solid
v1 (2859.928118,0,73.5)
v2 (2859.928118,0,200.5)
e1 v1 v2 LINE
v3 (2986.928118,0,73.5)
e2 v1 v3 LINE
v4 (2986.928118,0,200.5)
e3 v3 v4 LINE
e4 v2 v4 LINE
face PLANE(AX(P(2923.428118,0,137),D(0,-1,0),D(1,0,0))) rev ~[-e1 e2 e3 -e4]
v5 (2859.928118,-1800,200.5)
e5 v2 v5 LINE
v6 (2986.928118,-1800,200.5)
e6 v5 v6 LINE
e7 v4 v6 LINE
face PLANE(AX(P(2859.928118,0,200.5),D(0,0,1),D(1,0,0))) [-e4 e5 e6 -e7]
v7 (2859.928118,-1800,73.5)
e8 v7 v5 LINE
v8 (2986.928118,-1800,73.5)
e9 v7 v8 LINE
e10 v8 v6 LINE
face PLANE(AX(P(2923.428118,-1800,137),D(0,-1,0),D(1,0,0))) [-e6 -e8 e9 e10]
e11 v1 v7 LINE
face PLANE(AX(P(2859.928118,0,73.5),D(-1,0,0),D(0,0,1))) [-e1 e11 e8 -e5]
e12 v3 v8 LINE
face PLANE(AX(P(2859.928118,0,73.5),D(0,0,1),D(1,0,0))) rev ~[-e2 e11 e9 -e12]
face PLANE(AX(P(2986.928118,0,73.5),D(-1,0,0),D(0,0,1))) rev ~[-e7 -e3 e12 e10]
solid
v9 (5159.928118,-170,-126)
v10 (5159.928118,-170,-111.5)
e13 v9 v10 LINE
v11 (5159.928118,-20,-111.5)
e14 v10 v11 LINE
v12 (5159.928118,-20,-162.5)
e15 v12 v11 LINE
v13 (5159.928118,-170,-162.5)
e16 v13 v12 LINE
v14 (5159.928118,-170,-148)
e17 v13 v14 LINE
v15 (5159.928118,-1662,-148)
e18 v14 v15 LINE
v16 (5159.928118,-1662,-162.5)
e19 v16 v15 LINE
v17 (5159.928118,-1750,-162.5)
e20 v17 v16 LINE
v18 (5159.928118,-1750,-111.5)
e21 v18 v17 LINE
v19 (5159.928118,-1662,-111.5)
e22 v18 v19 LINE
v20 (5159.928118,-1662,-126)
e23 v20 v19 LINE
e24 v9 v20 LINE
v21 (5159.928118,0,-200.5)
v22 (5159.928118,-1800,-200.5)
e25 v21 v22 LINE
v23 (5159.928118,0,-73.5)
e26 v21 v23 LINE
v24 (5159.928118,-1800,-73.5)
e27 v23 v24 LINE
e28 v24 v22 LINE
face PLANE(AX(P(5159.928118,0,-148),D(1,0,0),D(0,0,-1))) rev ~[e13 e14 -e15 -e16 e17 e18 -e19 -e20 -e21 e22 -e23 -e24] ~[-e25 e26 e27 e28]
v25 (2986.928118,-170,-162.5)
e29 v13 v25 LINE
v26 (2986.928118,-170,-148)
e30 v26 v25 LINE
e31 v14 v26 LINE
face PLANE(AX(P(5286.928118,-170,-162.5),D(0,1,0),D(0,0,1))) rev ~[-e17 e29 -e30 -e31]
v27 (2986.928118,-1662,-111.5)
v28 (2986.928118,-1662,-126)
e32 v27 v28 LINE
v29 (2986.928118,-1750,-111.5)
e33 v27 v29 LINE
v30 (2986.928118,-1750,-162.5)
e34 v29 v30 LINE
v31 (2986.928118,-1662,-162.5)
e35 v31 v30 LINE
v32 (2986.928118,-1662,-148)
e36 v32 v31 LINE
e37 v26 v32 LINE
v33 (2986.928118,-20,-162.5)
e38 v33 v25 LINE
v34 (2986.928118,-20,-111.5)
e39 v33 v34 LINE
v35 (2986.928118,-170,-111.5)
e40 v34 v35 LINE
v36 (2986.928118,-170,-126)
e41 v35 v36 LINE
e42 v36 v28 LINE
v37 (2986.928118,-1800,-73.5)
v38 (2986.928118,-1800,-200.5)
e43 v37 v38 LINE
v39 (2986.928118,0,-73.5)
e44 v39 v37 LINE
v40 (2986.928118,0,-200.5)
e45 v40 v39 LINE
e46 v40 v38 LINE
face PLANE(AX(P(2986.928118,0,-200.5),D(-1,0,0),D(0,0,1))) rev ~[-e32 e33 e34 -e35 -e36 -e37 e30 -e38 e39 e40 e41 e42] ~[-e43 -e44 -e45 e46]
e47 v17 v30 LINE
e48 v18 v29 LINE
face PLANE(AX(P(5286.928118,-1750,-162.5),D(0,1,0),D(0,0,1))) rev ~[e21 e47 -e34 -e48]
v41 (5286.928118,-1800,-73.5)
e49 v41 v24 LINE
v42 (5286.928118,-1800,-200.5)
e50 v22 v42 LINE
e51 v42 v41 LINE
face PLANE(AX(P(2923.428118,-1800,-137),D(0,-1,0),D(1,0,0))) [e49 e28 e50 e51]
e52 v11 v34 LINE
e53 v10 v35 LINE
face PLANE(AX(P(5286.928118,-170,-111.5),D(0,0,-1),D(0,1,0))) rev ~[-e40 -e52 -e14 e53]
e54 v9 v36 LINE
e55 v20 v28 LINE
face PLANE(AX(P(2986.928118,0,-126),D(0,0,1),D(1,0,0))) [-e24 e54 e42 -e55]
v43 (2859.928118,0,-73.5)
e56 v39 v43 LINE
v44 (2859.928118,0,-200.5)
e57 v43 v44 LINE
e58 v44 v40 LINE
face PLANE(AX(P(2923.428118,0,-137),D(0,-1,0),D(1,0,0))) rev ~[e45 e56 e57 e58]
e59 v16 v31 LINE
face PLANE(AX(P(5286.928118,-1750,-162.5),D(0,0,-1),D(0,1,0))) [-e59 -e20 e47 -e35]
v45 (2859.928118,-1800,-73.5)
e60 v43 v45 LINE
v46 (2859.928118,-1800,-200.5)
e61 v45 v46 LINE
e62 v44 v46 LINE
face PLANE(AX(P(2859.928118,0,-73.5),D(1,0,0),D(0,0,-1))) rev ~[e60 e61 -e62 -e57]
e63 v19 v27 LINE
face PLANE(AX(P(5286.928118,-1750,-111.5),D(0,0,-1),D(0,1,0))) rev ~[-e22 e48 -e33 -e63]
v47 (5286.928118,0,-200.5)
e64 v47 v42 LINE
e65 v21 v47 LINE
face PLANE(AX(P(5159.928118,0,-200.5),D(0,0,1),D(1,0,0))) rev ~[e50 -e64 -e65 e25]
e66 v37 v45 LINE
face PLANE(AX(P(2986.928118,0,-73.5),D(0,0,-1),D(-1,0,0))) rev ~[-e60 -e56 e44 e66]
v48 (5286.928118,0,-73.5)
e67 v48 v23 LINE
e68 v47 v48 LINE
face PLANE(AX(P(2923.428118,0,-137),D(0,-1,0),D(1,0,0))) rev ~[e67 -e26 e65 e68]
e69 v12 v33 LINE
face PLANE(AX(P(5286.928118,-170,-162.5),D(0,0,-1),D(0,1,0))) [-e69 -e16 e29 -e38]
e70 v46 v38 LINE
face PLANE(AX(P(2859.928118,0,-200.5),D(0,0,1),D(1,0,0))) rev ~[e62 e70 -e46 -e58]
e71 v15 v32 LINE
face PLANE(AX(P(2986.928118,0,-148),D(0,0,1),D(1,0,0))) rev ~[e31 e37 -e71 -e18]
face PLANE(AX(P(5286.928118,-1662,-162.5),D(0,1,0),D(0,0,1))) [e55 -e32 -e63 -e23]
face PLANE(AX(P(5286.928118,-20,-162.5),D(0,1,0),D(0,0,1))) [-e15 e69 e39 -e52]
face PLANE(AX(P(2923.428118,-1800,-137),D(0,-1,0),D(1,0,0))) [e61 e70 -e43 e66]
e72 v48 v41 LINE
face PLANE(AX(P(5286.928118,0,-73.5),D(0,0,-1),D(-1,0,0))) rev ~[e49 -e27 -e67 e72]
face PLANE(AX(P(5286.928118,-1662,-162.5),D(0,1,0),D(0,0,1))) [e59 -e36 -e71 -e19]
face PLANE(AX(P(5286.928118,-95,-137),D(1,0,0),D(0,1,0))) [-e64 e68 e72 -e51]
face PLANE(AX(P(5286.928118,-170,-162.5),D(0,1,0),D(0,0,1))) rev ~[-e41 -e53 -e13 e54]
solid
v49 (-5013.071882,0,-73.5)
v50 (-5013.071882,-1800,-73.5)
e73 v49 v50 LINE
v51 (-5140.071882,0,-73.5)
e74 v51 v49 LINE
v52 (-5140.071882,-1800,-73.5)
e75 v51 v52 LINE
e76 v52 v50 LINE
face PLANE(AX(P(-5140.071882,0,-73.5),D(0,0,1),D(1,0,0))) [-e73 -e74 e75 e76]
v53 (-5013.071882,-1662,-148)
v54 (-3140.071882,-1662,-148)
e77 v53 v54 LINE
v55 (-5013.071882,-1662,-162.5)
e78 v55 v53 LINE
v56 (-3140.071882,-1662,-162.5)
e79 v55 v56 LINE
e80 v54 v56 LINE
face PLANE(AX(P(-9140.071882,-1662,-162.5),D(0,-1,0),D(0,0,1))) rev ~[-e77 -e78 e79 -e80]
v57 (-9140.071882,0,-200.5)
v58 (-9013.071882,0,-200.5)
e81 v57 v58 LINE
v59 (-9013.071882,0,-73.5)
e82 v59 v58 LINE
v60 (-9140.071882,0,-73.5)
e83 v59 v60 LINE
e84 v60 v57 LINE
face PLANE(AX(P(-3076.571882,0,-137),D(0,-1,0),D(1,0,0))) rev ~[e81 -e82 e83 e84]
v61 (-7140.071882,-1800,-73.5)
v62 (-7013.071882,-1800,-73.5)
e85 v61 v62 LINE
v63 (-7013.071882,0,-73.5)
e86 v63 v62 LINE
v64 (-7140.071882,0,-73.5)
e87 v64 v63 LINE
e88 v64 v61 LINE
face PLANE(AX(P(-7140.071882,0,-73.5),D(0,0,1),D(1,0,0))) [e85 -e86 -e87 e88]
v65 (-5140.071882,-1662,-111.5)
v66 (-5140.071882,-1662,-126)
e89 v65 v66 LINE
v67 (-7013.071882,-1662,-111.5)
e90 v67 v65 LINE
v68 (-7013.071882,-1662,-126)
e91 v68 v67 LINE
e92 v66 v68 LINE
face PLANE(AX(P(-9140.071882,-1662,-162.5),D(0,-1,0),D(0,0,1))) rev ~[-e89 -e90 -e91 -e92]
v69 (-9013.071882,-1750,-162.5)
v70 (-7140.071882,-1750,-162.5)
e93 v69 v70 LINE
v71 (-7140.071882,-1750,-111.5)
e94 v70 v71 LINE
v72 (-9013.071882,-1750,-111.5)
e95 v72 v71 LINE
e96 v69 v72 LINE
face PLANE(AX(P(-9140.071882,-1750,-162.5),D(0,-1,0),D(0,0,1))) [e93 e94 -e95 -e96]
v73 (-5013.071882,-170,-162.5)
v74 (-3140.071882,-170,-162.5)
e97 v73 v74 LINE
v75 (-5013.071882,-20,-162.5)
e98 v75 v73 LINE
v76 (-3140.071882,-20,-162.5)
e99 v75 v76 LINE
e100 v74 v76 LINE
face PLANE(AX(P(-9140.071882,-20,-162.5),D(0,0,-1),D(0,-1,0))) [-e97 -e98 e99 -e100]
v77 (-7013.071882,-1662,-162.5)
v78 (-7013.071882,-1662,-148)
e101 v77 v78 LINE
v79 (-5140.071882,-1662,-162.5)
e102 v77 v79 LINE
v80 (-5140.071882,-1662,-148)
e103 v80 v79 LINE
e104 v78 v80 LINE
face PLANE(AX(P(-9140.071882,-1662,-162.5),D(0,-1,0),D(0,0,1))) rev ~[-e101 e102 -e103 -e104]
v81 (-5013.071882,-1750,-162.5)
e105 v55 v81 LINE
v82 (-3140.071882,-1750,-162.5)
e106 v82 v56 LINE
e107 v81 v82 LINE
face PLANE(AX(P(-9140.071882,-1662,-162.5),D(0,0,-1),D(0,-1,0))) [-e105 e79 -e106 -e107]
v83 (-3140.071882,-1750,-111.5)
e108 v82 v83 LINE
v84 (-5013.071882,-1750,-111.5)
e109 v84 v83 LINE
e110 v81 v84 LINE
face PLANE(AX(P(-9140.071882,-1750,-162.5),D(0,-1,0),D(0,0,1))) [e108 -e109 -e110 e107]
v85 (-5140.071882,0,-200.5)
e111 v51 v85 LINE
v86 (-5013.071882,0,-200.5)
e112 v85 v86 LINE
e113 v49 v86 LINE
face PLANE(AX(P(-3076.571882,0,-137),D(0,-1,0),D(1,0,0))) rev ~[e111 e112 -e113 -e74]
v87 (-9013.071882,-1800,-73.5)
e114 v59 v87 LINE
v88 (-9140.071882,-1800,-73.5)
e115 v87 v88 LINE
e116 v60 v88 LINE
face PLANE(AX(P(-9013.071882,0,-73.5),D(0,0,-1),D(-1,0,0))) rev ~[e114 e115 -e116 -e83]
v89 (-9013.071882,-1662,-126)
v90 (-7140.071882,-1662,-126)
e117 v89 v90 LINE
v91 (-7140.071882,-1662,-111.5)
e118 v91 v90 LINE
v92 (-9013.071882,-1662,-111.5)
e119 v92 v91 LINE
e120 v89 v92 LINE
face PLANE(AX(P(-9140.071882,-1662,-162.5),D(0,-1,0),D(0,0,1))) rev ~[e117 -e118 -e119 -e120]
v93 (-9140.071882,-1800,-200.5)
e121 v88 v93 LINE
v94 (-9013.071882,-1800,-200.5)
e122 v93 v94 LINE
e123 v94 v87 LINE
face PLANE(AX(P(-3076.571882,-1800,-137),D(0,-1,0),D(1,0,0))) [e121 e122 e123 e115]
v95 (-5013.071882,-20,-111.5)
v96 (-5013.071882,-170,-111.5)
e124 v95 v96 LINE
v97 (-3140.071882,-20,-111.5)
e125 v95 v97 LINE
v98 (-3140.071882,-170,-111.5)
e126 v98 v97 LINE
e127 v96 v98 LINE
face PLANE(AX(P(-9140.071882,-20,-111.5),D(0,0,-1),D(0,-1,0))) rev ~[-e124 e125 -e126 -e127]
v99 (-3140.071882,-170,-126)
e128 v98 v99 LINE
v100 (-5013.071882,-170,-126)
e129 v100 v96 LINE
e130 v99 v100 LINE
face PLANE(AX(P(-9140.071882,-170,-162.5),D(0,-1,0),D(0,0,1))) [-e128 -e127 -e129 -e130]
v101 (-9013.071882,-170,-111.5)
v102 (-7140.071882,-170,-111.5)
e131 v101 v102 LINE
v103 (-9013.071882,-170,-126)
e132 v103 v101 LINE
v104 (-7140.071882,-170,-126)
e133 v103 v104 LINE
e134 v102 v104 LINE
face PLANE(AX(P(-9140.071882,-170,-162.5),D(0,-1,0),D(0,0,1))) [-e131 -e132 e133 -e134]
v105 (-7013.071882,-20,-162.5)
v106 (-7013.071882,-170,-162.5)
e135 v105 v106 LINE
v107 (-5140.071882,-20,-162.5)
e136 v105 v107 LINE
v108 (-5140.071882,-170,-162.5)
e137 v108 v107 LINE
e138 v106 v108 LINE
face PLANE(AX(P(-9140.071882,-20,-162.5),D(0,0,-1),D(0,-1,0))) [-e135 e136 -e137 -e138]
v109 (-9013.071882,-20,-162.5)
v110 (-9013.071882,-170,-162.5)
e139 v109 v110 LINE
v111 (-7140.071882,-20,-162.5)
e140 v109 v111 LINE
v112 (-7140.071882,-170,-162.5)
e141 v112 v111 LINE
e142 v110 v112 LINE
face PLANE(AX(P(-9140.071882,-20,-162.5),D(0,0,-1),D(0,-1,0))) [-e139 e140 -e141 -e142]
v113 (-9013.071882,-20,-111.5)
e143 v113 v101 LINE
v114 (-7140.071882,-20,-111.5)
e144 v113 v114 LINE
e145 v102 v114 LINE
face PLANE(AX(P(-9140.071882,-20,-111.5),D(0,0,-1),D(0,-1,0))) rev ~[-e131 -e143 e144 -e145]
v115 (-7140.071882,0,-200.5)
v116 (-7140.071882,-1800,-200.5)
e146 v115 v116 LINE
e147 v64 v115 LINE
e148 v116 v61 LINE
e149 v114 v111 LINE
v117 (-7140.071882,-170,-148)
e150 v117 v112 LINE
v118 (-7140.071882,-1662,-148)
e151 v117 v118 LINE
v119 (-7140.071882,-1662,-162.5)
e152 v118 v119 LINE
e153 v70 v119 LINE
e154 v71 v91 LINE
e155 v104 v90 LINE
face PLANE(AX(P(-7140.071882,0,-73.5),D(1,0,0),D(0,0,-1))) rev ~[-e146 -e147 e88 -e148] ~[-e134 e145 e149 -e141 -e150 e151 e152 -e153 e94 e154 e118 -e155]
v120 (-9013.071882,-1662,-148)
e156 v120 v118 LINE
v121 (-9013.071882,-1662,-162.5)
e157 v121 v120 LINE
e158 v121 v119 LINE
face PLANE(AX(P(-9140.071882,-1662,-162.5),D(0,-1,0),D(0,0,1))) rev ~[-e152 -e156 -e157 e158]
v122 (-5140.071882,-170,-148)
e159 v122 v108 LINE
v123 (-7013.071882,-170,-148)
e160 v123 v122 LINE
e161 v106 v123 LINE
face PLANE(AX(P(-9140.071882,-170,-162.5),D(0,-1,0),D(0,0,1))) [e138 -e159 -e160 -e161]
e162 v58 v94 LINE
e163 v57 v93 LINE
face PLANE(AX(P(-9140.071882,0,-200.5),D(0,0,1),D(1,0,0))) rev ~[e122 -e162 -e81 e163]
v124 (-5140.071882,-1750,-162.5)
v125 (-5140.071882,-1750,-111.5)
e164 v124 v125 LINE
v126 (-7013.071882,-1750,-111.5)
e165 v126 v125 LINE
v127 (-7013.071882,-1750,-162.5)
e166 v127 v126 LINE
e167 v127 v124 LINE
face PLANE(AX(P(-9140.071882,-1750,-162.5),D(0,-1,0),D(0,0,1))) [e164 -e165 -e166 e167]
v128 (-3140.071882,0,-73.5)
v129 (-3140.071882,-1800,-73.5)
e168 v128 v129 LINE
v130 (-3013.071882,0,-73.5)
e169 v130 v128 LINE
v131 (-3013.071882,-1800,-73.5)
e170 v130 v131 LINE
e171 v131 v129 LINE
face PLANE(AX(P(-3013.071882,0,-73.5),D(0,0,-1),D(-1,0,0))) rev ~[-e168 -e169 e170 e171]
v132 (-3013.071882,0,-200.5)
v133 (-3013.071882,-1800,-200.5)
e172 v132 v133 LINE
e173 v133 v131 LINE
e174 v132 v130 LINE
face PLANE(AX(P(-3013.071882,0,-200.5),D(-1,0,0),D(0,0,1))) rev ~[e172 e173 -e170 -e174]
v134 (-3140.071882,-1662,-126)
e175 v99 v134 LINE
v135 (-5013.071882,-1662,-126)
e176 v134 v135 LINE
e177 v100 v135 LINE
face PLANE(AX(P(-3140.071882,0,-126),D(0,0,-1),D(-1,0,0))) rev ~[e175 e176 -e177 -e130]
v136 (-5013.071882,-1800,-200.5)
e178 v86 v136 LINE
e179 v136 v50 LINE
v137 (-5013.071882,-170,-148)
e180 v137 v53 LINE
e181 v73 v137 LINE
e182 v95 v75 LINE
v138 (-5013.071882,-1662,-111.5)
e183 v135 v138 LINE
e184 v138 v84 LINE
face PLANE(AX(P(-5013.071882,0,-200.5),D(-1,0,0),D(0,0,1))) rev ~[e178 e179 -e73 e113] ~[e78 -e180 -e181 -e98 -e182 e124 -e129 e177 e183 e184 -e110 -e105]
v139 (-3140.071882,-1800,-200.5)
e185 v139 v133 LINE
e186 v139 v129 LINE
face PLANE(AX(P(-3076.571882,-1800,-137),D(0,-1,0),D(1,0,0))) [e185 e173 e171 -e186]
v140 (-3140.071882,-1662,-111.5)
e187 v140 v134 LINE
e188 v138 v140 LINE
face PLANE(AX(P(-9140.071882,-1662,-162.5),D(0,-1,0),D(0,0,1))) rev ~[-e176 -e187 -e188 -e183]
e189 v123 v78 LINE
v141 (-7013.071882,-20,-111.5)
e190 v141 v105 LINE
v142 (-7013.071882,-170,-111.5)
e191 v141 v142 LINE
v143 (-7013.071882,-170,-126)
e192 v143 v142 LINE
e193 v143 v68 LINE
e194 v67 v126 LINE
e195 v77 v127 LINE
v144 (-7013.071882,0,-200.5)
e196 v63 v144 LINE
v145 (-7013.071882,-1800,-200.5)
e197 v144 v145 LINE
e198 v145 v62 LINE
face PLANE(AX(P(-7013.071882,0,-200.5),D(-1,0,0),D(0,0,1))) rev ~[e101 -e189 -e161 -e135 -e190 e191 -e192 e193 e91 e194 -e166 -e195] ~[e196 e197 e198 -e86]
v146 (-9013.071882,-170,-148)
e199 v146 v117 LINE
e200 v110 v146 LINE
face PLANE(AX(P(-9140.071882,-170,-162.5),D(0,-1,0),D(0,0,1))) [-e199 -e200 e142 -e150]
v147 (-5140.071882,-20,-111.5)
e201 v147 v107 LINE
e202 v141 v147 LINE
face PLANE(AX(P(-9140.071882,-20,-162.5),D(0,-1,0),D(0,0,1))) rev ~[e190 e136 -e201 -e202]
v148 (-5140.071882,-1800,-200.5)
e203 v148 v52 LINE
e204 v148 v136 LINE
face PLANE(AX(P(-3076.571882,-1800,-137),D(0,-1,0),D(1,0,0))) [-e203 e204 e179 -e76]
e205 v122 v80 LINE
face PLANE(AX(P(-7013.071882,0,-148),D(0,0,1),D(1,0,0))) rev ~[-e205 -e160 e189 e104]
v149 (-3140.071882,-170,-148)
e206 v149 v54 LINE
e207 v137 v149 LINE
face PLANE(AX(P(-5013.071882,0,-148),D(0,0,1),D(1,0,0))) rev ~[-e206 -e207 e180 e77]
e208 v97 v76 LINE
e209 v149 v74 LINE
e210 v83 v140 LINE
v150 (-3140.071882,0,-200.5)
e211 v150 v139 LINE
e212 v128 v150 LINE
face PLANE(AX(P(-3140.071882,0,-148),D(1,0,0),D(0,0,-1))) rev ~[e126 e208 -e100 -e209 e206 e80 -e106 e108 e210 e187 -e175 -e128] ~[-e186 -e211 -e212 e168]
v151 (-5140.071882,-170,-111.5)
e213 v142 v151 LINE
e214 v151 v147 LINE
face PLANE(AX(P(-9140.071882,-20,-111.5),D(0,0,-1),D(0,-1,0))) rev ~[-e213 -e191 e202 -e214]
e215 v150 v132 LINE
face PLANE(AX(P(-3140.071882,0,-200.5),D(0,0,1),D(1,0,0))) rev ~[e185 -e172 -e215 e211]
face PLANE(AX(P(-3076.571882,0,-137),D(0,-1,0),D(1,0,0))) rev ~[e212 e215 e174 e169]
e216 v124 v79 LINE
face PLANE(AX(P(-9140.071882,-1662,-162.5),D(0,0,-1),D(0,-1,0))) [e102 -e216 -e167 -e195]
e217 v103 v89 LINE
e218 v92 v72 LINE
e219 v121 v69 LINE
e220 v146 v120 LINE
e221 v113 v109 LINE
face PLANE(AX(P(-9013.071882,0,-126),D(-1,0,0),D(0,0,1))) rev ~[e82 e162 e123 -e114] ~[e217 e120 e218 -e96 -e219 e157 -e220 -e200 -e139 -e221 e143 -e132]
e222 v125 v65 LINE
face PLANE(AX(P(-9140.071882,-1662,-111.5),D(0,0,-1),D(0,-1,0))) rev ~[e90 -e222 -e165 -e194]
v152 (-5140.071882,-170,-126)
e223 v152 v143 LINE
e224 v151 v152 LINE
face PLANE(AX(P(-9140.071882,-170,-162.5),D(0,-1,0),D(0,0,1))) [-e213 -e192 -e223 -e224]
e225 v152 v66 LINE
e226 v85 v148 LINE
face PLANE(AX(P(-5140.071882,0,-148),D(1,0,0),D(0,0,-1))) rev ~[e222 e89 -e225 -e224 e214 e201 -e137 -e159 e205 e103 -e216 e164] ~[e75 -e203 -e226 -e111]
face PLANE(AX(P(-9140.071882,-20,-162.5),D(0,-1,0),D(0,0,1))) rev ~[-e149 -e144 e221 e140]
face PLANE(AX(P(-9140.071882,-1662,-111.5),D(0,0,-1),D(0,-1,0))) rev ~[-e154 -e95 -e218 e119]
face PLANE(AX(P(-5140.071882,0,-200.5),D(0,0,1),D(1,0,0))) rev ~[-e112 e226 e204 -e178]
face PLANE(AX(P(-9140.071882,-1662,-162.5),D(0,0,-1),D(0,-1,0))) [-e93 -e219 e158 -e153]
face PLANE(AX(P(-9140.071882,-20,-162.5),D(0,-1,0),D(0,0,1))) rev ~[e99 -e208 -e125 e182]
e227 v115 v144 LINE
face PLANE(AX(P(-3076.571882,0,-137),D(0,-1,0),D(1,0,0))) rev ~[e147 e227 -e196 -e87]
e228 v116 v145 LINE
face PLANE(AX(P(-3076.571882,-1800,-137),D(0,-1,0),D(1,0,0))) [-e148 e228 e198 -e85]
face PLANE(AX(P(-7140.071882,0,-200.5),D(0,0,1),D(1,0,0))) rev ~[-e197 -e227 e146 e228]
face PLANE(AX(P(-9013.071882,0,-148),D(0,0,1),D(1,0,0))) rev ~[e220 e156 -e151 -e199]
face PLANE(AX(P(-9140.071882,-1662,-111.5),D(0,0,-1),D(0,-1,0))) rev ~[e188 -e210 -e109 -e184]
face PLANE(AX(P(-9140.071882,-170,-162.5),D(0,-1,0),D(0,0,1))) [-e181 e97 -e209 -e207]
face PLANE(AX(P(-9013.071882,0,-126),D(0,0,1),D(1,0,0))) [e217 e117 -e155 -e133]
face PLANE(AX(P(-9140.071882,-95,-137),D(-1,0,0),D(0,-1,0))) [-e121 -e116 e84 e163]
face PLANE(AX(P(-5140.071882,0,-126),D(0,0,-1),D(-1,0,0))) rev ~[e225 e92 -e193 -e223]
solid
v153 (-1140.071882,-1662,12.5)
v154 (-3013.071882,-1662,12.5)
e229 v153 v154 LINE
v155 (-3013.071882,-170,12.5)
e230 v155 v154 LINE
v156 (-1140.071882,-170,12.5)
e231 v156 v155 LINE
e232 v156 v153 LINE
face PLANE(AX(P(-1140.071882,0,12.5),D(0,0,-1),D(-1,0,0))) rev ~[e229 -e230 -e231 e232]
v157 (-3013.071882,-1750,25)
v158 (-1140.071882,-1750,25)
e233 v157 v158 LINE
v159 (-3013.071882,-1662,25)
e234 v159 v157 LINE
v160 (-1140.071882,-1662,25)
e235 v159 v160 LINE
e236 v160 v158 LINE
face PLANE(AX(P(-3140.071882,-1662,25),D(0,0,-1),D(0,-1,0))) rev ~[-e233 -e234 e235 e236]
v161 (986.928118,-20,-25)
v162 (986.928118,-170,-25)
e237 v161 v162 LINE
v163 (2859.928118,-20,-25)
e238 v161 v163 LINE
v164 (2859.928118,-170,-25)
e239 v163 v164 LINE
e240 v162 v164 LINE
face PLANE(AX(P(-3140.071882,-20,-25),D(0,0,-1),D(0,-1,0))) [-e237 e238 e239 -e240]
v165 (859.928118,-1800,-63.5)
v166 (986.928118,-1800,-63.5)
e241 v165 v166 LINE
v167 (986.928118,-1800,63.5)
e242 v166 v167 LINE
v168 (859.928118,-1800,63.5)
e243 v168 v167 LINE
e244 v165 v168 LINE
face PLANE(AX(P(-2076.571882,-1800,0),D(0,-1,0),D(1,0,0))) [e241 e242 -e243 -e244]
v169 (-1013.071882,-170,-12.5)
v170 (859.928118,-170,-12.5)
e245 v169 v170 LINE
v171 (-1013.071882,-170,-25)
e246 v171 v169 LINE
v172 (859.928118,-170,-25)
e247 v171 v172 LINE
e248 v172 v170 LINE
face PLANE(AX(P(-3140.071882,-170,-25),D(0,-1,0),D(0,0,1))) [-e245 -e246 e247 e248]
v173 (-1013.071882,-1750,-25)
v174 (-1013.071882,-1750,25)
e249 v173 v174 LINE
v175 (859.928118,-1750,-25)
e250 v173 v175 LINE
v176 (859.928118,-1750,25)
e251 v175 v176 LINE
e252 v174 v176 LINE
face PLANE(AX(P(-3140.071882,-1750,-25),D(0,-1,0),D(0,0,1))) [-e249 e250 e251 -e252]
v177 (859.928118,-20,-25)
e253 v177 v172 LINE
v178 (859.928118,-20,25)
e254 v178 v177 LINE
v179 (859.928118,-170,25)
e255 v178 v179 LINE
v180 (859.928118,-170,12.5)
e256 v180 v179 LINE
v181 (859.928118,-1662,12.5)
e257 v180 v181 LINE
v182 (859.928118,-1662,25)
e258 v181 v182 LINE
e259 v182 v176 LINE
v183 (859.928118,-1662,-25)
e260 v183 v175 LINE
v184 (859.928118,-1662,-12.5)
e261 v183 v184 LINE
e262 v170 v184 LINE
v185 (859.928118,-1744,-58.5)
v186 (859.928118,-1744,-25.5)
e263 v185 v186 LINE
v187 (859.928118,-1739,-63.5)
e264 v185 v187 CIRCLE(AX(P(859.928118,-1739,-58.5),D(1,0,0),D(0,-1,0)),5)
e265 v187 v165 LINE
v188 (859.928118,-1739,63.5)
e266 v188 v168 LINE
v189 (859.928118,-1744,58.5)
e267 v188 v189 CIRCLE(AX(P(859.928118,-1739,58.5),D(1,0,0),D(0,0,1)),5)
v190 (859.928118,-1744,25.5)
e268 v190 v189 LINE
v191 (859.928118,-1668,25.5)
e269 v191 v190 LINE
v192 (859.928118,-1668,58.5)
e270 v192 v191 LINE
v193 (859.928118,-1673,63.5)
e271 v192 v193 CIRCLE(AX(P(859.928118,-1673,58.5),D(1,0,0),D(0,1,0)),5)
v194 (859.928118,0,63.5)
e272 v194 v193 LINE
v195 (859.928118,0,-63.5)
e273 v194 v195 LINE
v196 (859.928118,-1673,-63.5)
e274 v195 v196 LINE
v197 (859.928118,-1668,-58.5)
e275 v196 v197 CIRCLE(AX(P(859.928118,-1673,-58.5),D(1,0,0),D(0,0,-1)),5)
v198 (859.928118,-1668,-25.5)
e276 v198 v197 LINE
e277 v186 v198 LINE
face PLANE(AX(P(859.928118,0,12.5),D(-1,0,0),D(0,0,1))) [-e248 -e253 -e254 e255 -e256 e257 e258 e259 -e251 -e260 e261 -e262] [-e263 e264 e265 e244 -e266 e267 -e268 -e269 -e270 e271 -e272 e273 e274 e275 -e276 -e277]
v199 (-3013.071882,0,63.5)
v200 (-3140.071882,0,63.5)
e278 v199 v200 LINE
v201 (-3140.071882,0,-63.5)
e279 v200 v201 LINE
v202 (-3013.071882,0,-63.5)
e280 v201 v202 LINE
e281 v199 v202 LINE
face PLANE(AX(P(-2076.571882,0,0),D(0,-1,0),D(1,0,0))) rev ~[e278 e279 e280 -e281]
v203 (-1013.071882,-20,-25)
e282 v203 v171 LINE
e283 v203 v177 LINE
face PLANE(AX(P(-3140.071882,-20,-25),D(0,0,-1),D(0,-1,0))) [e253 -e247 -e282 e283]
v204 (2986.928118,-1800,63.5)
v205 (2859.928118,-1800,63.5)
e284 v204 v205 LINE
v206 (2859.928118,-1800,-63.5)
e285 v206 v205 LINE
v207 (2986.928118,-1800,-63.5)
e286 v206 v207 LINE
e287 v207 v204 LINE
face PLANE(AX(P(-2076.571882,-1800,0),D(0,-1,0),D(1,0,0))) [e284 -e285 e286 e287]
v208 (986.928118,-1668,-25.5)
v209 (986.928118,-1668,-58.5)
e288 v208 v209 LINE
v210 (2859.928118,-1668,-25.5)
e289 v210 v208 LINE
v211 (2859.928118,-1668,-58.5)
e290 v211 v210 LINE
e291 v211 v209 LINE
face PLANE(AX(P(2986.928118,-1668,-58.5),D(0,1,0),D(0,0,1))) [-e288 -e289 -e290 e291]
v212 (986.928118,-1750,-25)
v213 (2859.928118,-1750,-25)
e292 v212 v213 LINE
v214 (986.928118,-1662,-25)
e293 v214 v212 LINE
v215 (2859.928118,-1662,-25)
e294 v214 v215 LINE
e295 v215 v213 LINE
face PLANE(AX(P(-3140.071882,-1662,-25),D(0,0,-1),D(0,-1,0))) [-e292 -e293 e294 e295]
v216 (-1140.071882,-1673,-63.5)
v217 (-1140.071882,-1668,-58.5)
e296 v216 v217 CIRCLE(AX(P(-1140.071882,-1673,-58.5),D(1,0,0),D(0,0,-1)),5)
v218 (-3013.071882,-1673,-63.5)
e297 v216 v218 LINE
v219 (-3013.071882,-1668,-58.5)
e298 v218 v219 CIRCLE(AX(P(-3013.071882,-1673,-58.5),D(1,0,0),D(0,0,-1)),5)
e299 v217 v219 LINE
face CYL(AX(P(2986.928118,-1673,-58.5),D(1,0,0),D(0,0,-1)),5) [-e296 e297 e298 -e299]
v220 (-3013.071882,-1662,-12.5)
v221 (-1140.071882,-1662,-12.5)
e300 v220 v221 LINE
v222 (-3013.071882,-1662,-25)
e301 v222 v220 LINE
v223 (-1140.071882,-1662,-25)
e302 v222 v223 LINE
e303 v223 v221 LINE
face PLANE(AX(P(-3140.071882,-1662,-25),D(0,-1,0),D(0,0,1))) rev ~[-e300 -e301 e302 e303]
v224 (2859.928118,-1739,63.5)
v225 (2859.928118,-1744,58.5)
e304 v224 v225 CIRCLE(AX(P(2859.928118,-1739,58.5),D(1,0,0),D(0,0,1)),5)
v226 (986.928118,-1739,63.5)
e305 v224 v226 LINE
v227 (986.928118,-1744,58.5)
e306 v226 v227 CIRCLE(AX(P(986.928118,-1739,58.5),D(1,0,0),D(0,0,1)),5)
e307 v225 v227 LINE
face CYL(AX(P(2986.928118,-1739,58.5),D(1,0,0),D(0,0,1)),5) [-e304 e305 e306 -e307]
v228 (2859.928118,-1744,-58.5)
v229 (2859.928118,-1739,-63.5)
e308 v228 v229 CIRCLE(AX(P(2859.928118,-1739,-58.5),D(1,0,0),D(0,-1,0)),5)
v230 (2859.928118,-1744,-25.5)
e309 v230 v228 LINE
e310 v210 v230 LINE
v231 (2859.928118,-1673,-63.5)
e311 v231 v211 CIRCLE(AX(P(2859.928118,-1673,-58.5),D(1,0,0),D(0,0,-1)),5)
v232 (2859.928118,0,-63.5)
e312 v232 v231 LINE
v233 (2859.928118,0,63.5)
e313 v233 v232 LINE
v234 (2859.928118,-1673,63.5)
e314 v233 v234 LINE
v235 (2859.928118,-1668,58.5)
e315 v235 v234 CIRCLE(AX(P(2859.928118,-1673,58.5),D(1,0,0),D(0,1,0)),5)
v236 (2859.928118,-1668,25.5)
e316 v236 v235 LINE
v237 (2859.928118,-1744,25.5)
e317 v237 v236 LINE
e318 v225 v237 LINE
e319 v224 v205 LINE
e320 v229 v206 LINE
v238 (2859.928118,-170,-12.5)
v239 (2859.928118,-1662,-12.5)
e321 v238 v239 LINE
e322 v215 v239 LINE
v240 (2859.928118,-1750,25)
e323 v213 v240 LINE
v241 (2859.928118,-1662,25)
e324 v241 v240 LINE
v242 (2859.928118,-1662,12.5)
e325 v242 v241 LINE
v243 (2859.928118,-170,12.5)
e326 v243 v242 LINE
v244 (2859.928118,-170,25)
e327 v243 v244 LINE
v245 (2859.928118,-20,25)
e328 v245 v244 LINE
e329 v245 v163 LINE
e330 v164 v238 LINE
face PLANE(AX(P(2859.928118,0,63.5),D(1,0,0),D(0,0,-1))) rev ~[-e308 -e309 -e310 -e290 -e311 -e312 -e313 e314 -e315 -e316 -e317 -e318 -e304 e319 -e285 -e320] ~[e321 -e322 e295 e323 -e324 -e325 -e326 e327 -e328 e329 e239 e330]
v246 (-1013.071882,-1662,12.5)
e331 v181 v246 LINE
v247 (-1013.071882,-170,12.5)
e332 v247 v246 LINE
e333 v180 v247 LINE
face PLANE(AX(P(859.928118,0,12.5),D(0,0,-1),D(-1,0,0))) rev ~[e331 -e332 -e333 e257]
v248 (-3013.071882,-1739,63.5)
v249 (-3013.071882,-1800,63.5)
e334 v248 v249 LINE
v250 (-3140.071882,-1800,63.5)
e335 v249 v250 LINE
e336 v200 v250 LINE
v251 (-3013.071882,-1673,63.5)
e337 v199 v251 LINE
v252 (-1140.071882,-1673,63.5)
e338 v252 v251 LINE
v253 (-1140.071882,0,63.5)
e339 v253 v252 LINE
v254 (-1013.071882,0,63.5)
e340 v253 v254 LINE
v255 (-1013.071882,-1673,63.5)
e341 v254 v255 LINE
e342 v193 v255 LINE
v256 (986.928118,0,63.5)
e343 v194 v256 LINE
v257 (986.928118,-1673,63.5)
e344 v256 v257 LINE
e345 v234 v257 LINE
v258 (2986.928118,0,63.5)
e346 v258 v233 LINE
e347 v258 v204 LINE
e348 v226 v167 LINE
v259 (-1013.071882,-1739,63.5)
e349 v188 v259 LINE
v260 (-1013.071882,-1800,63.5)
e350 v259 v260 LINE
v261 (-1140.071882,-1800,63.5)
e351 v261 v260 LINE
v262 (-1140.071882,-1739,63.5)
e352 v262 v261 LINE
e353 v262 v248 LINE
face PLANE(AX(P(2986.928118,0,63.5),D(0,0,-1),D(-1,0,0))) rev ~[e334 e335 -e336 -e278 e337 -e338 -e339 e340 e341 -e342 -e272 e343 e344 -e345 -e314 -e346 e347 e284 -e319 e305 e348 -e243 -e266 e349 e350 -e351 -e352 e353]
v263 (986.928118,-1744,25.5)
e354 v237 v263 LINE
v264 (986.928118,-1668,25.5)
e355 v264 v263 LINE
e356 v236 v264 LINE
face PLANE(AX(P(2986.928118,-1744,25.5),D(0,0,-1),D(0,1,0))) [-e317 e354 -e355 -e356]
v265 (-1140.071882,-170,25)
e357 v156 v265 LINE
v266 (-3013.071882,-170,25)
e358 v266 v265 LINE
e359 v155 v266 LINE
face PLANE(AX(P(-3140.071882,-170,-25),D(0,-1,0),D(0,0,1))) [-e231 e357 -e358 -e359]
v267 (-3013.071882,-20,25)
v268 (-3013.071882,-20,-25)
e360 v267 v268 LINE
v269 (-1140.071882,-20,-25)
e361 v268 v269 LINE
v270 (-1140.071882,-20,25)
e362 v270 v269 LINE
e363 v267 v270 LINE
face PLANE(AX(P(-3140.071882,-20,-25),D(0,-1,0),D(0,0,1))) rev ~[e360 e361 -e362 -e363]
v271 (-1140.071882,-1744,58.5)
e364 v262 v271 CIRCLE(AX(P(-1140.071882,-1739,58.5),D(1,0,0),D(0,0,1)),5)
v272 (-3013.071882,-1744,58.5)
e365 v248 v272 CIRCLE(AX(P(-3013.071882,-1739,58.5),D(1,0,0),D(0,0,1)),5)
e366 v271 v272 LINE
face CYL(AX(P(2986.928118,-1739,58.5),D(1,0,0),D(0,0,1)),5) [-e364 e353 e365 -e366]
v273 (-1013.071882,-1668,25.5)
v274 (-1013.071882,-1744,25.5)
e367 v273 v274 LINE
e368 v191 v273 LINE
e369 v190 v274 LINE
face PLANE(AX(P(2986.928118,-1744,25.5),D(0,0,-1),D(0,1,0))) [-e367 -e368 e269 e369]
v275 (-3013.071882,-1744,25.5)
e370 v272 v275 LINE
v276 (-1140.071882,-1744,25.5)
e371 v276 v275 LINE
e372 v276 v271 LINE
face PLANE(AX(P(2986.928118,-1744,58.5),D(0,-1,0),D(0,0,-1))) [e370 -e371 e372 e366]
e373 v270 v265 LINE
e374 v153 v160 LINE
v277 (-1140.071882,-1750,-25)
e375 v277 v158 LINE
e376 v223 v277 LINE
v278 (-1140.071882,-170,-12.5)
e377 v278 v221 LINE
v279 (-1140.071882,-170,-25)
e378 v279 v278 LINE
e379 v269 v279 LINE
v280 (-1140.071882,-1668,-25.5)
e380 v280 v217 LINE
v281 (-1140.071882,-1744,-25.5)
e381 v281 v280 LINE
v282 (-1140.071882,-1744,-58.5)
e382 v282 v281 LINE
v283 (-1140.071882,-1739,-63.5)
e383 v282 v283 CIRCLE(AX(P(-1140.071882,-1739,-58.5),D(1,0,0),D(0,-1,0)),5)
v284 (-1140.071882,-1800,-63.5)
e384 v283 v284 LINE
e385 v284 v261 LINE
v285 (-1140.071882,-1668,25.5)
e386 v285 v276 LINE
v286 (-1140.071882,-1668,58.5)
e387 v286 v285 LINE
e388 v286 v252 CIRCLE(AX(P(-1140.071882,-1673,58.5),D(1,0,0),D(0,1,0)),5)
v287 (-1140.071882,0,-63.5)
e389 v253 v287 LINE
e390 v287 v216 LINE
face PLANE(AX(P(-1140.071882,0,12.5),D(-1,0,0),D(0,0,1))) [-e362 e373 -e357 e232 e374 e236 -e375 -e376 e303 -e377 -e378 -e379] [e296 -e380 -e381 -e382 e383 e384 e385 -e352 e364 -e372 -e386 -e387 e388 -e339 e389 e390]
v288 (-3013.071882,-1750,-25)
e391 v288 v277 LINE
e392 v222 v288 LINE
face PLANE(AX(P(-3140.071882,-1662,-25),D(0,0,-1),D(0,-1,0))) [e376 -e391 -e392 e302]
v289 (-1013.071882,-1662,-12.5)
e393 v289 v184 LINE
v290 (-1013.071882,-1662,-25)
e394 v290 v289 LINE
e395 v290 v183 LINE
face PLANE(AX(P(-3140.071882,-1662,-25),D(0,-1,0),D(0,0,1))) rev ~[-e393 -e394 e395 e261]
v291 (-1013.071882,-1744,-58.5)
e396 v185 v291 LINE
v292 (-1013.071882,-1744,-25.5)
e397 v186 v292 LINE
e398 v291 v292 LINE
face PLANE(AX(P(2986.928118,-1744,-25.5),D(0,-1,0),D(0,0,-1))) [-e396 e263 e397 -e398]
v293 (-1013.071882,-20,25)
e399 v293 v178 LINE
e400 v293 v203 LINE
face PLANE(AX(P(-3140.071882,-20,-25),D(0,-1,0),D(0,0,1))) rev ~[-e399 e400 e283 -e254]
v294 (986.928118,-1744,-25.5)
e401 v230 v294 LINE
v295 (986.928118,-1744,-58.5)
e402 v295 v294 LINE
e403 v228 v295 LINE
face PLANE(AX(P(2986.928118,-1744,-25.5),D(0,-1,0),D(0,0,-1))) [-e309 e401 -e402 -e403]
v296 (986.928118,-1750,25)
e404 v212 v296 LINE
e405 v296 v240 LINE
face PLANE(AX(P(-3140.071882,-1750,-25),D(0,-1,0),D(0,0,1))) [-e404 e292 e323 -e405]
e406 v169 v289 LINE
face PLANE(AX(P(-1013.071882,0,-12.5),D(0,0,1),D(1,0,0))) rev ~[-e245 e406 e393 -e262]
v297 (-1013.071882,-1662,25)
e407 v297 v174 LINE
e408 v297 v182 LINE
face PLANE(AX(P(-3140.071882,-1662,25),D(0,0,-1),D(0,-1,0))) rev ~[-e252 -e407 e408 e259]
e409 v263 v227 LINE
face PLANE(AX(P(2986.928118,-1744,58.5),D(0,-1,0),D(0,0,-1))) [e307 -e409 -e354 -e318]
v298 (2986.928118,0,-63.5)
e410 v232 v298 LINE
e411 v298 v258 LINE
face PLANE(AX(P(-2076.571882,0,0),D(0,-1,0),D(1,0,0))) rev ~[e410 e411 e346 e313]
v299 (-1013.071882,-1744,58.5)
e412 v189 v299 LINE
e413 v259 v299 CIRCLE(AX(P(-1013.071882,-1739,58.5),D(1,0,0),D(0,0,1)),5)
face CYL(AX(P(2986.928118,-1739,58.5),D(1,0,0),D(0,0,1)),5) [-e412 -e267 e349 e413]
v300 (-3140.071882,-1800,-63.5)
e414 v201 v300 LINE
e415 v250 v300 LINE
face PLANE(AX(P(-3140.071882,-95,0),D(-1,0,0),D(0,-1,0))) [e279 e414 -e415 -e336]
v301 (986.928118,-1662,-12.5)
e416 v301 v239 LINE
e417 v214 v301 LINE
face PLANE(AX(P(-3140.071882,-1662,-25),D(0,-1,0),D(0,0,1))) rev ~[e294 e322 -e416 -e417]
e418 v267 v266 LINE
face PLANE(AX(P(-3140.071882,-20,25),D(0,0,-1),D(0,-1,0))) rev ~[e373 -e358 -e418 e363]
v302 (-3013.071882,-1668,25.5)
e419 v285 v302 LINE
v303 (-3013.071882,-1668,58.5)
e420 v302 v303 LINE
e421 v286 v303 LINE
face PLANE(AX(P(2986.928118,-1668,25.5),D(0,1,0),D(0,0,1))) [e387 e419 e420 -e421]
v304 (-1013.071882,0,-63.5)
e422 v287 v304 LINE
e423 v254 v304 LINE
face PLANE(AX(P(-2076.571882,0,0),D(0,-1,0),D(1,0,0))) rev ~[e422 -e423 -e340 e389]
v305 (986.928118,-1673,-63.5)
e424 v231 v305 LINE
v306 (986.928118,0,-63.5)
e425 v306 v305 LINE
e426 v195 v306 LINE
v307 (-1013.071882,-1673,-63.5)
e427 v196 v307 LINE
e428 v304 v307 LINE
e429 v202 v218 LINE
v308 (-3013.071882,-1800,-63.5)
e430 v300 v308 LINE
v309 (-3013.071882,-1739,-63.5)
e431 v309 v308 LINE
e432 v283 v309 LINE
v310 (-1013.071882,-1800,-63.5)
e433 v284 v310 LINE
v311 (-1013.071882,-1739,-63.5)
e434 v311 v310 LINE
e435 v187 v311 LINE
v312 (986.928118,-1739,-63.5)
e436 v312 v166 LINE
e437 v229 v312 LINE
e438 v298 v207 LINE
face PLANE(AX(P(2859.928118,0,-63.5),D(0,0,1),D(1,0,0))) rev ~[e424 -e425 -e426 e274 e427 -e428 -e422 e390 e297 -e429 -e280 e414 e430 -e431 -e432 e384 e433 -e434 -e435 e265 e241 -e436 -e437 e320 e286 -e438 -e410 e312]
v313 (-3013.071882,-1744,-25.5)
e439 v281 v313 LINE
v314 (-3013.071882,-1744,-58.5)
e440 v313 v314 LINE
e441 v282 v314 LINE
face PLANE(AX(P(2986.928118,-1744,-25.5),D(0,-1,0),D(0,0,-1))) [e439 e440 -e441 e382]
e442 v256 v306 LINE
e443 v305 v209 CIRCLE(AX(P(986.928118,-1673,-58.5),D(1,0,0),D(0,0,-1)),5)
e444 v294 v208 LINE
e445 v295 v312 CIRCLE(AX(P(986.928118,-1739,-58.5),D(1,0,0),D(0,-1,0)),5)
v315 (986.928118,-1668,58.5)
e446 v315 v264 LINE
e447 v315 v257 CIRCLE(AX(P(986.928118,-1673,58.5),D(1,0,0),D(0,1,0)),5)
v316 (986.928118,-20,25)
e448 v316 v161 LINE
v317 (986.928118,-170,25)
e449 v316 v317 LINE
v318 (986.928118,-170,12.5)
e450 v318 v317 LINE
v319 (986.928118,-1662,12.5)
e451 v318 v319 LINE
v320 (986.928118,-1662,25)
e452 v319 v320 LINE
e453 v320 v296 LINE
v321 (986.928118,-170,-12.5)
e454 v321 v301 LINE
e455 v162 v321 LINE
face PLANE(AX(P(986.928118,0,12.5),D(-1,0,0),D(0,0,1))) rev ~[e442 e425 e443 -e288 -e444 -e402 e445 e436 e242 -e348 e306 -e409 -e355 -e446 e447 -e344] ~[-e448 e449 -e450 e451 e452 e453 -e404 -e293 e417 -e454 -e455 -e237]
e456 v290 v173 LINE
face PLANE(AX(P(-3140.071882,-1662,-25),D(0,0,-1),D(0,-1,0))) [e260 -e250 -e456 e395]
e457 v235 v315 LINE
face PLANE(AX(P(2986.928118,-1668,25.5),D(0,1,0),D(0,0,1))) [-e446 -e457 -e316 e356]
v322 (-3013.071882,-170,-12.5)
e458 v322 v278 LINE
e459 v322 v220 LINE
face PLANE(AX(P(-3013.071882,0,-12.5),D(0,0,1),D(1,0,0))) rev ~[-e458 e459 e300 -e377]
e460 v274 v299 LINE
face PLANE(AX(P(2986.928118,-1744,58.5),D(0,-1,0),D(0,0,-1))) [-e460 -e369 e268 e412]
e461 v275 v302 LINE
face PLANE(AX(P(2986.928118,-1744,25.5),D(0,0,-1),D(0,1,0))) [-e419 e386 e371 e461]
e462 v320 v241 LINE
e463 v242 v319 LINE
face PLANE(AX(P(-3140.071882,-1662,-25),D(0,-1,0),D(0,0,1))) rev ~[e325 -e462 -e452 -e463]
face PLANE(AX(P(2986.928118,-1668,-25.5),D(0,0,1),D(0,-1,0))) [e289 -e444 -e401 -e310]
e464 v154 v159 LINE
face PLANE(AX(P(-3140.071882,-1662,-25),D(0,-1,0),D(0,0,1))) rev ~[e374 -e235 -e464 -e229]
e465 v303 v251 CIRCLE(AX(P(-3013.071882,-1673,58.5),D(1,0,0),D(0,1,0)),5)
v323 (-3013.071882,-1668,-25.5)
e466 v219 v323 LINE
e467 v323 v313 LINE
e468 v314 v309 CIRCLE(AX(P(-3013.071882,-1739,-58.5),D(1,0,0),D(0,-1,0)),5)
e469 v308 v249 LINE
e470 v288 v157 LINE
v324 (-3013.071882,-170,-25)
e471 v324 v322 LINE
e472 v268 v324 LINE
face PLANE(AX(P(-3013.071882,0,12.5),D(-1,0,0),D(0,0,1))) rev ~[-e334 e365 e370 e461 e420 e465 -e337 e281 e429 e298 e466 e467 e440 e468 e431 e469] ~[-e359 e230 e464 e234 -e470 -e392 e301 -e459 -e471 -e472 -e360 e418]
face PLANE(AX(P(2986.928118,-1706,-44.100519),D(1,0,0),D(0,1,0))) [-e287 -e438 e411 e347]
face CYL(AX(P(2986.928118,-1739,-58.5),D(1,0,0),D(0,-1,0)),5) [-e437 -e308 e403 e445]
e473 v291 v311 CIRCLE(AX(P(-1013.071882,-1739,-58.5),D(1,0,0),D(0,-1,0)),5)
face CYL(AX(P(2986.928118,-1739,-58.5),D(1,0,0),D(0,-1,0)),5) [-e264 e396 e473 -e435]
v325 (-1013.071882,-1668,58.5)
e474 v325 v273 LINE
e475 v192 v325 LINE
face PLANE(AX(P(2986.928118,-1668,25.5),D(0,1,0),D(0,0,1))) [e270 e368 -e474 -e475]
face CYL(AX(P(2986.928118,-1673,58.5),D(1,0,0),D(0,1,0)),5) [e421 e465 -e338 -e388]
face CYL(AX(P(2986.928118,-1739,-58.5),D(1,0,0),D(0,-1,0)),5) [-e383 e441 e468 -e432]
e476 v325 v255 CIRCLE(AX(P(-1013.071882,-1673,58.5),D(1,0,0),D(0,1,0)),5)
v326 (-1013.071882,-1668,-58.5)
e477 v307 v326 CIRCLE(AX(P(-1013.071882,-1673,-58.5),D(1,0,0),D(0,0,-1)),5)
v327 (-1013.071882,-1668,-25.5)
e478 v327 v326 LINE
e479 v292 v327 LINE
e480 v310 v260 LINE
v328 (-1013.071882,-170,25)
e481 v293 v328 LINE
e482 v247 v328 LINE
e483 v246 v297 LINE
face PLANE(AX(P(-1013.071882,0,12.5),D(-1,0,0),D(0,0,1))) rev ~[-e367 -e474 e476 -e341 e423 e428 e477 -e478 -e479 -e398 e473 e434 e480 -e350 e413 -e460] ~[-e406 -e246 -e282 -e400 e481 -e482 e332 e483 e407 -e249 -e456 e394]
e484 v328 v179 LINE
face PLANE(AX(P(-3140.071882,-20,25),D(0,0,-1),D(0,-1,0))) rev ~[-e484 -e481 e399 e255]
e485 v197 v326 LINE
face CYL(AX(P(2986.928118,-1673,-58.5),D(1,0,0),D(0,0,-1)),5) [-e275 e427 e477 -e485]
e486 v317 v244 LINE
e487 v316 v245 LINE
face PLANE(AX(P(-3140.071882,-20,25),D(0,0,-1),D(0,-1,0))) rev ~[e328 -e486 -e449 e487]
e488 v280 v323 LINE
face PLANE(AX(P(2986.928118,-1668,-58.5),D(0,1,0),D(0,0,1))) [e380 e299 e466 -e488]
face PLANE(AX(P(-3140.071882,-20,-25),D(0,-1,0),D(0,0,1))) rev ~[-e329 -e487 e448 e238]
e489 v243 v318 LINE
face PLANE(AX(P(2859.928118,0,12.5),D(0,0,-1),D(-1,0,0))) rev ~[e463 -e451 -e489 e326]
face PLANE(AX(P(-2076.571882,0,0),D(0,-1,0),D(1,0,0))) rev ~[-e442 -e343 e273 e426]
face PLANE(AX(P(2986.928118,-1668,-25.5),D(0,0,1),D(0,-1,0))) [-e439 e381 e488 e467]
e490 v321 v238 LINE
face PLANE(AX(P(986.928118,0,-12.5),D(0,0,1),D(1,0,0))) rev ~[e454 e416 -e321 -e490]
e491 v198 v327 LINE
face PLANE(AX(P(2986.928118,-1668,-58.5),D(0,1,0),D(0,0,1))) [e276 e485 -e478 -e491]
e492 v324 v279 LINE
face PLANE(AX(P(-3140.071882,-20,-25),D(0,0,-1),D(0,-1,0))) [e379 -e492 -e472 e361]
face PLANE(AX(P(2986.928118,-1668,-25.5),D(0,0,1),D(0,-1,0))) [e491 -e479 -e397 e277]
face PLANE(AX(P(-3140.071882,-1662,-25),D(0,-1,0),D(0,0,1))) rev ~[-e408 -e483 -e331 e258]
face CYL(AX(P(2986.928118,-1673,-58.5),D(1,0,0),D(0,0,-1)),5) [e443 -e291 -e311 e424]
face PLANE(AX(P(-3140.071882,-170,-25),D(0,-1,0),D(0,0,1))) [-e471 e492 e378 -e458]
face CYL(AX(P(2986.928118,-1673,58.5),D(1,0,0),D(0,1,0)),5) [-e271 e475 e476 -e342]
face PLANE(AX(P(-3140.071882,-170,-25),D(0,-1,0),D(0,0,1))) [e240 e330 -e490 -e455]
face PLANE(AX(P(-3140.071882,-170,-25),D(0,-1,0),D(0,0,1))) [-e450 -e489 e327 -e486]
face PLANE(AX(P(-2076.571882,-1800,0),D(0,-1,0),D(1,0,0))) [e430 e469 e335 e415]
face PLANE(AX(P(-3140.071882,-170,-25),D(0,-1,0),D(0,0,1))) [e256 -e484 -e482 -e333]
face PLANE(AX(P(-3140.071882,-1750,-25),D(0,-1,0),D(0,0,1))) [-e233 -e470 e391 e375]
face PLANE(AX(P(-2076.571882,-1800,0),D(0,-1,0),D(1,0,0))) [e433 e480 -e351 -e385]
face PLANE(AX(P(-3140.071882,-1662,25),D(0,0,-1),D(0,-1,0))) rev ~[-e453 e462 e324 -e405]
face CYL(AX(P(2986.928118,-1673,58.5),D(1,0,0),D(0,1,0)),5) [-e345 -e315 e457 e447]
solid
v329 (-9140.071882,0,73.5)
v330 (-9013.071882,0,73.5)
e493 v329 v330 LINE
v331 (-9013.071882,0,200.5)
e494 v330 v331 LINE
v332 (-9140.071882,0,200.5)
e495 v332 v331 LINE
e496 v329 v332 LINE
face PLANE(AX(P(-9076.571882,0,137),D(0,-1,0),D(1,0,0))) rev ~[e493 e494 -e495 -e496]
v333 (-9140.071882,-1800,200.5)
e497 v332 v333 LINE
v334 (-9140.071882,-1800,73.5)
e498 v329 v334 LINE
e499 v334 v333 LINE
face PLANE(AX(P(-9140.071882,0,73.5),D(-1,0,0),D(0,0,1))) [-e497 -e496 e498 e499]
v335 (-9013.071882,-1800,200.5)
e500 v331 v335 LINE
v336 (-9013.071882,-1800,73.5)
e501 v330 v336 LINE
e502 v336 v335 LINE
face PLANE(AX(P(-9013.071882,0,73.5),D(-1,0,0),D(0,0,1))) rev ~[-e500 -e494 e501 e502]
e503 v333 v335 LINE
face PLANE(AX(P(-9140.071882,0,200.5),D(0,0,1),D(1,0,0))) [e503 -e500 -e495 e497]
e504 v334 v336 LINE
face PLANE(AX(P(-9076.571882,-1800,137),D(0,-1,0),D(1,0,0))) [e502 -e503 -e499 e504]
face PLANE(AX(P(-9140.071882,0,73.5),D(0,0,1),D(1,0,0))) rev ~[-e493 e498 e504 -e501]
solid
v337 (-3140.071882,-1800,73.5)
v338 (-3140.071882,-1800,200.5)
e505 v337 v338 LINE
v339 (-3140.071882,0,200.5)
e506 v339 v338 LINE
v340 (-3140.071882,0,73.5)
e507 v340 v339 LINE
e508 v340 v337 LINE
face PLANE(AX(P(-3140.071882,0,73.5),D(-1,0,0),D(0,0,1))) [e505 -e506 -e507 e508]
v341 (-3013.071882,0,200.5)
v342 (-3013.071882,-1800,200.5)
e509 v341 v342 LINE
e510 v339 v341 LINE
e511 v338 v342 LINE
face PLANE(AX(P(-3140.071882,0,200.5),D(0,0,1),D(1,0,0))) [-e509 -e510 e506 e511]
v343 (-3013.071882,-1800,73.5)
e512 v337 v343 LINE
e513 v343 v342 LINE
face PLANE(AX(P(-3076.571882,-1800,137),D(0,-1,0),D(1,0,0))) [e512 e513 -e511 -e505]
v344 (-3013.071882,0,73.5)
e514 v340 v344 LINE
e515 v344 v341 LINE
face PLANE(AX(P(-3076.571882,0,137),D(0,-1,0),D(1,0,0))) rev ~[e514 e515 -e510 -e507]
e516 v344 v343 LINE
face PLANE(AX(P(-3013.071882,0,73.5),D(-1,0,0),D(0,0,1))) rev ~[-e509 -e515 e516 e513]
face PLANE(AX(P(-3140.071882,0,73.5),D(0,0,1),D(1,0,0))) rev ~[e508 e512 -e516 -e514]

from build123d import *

# Parameters (mm, degrees)
F0_W        = 1873
F0_H        = 25
F0_W_2      = 63.5
F0_W_3      = 127
F0_H_2      = 51
F1_DEPTH    = 1800
F2_W        = 150
F2_H        = 50
F2_W_2      = 88
F3_DEPTH    = 6000
F4_DEPTH    = 50
F0_H_3      = 127
F5_DEPTH    = 1800
F0_H_4      = 22
F0_H_5      = 52.5
F0_W_4      = 2173
F6_W        = 150
F6_H        = 51
F6_W_2      = 88
F7_DEPTH    = 2370
F8_W        = 150
F8_H        = 51
F8_W_2      = 88
F9_DEPTH    = 6090
F7_FACE_W   = 2173
F7_FACE_H   = 50
F7_FACE_H_2 = 20
F9_FACE_W   = 1873
F9_FACE_H   = 50
F9_FACE_H_2 = 20
F10_DEPTH   = 50
F12_DEPTH   = 6000


# Not quite as in the source:
# - a feature names something its author has since deleted; it is built from what else it names


with BuildPart() as f1:
    # F0 (on Front) → F1 (new body)
    with BuildSketch(Plane.XZ):
        with Locations((-2076.5718817711, 0)):
            Rectangle(F0_W, F0_H)
        with Locations((-3044.8218817711, 0)):
            Rectangle(F0_W_2, F0_H)
        with Locations((-1076.5718817711, 0)):
            Rectangle(F0_W_3, F0_H)
        with Locations((-76.5718817711, 0)):
            Rectangle(F0_W, F0_H)
        with Locations((923.4281182289, 0)):
            Rectangle(F0_W_3, F0_H)
        with Locations((1923.4281182289, 0)):
            Rectangle(F0_W, F0_H)
        with Locations((2891.6781182289, 0)):
            Rectangle(F0_W_2, F0_H)
        Polygon((-3013.0718817711, -63.5), (-3013.0718817711, -12.5), (-3076.5718817711, -12.5), (-3076.5718817711, 12.5), (-3013.0718817711, 12.5), (-3013.0718817711, 63.5), (-3140.0718817711, 63.5), (-3140.0718817711, -63.5), align=None)
        with Locations((-1076.5718817711, -38)):
            Rectangle(F0_W_3, F0_H_2)
        with Locations((-1076.5718817711, 38)):
            Rectangle(F0_W_3, F0_H_2)
        with Locations((923.4281182289, -38)):
            Rectangle(F0_W_3, F0_H_2)
        with Locations((923.4281182289, 38)):
            Rectangle(F0_W_3, F0_H_2)
        Polygon((2923.4281182289, 12.5), (2923.4281182289, -12.5), (2859.9281182289, -12.5), (2859.9281182289, -63.5), (2986.9281182289, -63.5), (2986.9281182289, 63.5), (2859.9281182289, 63.5), (2859.9281182289, 12.5), align=None)
    extrude(amount=F1_DEPTH)

    # F2 (on face) → F3 (join)
    with BuildSketch(Plane(origin=(-3140.0718817711, 0, 0), x_dir=(0, -1, 0), z_dir=(-1, 0, 0))):
        with Locations((95, 0)):
            Rectangle(F2_W, F2_H)
        with Locations((1706, 0)):
            Rectangle(F2_W_2, F2_H)
    extrude(amount=-F3_DEPTH)

    # F4 (cut): faces of the model
    f4_faces = [f1.faces().sort_by_distance(p)[0] for p in [
        (1923.4281182289, -1775, 12.5),
        (-76.5718817711, -1775, 12.5),
        (-2076.5718817711, -1775, 12.5),
        (-2076.5718817711, -10, 12.5),
        (-76.5718817711, -10, 12.5),
        (1923.4281182289, -10, 12.5),
    ]]
    extrude(f4_faces, amount=-F4_DEPTH, mode=Mode.SUBTRACT)

    # F11 (on face) → F12 (join)
    with BuildSketch(Plane.YZ.offset(2986.9281182289)):
        with BuildLine():
            Line((-1668, -58.5), (-1668, -25.5))
            Line((-1668, -25.5), (-1744, -25.5))
            Line((-1744, -25.5), (-1744, -58.5))
            ThreePointArc((-1744, -58.5), (-1742.5355339059, -62.0355339059), (-1739, -63.5))
            Line((-1739, -63.5), (-1673, -63.5))
            ThreePointArc((-1673, -63.5), (-1669.4644660941, -62.0355339059), (-1668, -58.5))
        make_face()
        with BuildLine():
            Line((-1744, 25.5), (-1668, 25.5))
            Line((-1668, 25.5), (-1668, 58.5))
            ThreePointArc((-1668, 58.5), (-1669.4644660941, 62.0355339059), (-1673, 63.5))
            Line((-1673, 63.5), (-1739, 63.5))
            ThreePointArc((-1739, 63.5), (-1742.5355339059, 62.0355339059), (-1744, 58.5))
            Line((-1744, 58.5), (-1744, 25.5))
        make_face()
    extrude(amount=-F12_DEPTH)


with BuildPart() as f5:
    # F0 (on Front) → F5 (new body)
    with BuildSketch(Plane.XZ):
        with Locations((-3076.5718817711, 137)):
            Rectangle(F0_W_3, F0_H_3)
    extrude(amount=F5_DEPTH)


with BuildPart() as f5b:
    # F0 (on Front) → F5, piece 2 (new body)
    with BuildSketch(Plane.XZ):
        Polygon((-3140.0718817711, -200.5), (-3013.0718817711, -200.5), (-3013.0718817711, -73.5), (-3140.0718817711, -73.5), (-3140.0718817711, -126), (-3140.0718817711, -148), align=None)
        with Locations((-4076.5718817711, -137)):
            Rectangle(F0_W, F0_H_4)
        with Locations((-5076.5718817711, -174.25)):
            Rectangle(F0_W_3, F0_H_5)
        with Locations((-5076.5718817711, -137)):
            Rectangle(F0_W_3, F0_H_4)
        with Locations((-5076.5718817711, -99.75)):
            Rectangle(F0_W_3, F0_H_5)
        with Locations((-6076.5718817711, -137)):
            Rectangle(F0_W, F0_H_4)
        with Locations((-7076.5718817711, -174.25)):
            Rectangle(F0_W_3, F0_H_5)
        with Locations((-7076.5718817711, -137)):
            Rectangle(F0_W_3, F0_H_4)
        with Locations((-7076.5718817711, -99.75)):
            Rectangle(F0_W_3, F0_H_5)
        with Locations((-8076.5718817711, -137)):
            Rectangle(F0_W, F0_H_4)
        Polygon((-9013.0718817711, -200.5), (-9013.0718817711, -148), (-9013.0718817711, -126), (-9013.0718817711, -73.5), (-9140.0718817711, -73.5), (-9140.0718817711, -200.5), align=None)
    extrude(amount=F5_DEPTH)

    # F8 (on face) → F9 (join)
    with BuildSketch(Plane(origin=(-9140.0718817711, 0, 0), x_dir=(0, -1, 0), z_dir=(-1, 0, 0))):
        with Locations((95, -137)):
            Rectangle(F8_W, F8_H)
        with Locations((1706, -137)):
            Rectangle(F8_W_2, F8_H)
    extrude(amount=-F9_DEPTH)


with BuildPart() as f5c:
    # F0 (on Front) → F5, piece 3 (new body)
    with BuildSketch(Plane.XZ):
        with Locations((-9076.5718817711, 137)):
            Rectangle(F0_W_3, F0_H_3)
    extrude(amount=F5_DEPTH)


with BuildPart() as f5d:
    # F0 (on Front) → F5, piece 4 (new body)
    with BuildSketch(Plane.XZ):
        Polygon((2859.9281182289, -200.5), (2986.9281182289, -200.5), (2986.9281182289, -148), (2986.9281182289, -126), (2986.9281182289, -73.5), (2859.9281182289, -73.5), align=None)
        with Locations((4073.4281182289, -137)):
            Rectangle(F0_W_4, F0_H_4)
        Polygon((5159.9281182289, -126), (5159.9281182289, -148), (5159.9281182289, -200.5), (5286.9281182289, -200.5), (5286.9281182289, -73.5), (5159.9281182289, -73.5), align=None)
    extrude(amount=F5_DEPTH)

    # F6 (on face) → F7 (join)
    with BuildSketch(Plane.YZ.offset(5286.9281182289)):
        with Locations((-95, -137)):
            Rectangle(F6_W, F6_H)
        with Locations((-1706, -137)):
            Rectangle(F6_W_2, F6_H)
    extrude(amount=-F7_DEPTH)


with BuildPart() as f5e:
    # F0 (on Front) → F5, piece 5 (new body)
    with BuildSketch(Plane.XZ):
        with Locations((2923.4281182289, 137)):
            Rectangle(F0_W_3, F0_H_3)
    extrude(amount=F5_DEPTH)


with BuildPart() as f10_tool:
    # F7_face (on face) + F9_face (on face) → F10 (new body)
    with BuildSketch(Plane(origin=(4073.4281182289, -1775, -148), x_dir=(1, 0, 0), z_dir=(0, 0, -1))):
        Rectangle(F7_FACE_W, F7_FACE_H)
        with Locations((0, -1765)):
            Rectangle(F7_FACE_W, F7_FACE_H_2)
    with BuildSketch(Plane(origin=(-4076.5718817711, -1775, -148), x_dir=(1, 0, 0), z_dir=(0, 0, -1))):
        Rectangle(F9_FACE_W, F9_FACE_H)
        with Locations((-2000, 0)):
            Rectangle(F9_FACE_W, F9_FACE_H)
        with Locations((-4000, 0)):
            Rectangle(F9_FACE_W, F9_FACE_H)
        with Locations((-4000, -1765)):
            Rectangle(F9_FACE_W, F9_FACE_H_2)
        with Locations((-2000, -1765)):
            Rectangle(F9_FACE_W, F9_FACE_H_2)
        with Locations((0, -1765)):
            Rectangle(F9_FACE_W, F9_FACE_H_2)
    extrude(amount=-F10_DEPTH)


with BuildPart() as f5b_1:
    add(f5b.part)

    # F10: cut by f10_tool
    add(f10_tool.part, mode=Mode.SUBTRACT)


with BuildPart() as f5d_1:
    add(f5d.part)

    # F10: cut by f10_tool
    add(f10_tool.part, mode=Mode.SUBTRACT)


solid = Compound([f1.part, f5.part, f5c.part, f5e.part, f5b_1.part, f5d_1.part])
